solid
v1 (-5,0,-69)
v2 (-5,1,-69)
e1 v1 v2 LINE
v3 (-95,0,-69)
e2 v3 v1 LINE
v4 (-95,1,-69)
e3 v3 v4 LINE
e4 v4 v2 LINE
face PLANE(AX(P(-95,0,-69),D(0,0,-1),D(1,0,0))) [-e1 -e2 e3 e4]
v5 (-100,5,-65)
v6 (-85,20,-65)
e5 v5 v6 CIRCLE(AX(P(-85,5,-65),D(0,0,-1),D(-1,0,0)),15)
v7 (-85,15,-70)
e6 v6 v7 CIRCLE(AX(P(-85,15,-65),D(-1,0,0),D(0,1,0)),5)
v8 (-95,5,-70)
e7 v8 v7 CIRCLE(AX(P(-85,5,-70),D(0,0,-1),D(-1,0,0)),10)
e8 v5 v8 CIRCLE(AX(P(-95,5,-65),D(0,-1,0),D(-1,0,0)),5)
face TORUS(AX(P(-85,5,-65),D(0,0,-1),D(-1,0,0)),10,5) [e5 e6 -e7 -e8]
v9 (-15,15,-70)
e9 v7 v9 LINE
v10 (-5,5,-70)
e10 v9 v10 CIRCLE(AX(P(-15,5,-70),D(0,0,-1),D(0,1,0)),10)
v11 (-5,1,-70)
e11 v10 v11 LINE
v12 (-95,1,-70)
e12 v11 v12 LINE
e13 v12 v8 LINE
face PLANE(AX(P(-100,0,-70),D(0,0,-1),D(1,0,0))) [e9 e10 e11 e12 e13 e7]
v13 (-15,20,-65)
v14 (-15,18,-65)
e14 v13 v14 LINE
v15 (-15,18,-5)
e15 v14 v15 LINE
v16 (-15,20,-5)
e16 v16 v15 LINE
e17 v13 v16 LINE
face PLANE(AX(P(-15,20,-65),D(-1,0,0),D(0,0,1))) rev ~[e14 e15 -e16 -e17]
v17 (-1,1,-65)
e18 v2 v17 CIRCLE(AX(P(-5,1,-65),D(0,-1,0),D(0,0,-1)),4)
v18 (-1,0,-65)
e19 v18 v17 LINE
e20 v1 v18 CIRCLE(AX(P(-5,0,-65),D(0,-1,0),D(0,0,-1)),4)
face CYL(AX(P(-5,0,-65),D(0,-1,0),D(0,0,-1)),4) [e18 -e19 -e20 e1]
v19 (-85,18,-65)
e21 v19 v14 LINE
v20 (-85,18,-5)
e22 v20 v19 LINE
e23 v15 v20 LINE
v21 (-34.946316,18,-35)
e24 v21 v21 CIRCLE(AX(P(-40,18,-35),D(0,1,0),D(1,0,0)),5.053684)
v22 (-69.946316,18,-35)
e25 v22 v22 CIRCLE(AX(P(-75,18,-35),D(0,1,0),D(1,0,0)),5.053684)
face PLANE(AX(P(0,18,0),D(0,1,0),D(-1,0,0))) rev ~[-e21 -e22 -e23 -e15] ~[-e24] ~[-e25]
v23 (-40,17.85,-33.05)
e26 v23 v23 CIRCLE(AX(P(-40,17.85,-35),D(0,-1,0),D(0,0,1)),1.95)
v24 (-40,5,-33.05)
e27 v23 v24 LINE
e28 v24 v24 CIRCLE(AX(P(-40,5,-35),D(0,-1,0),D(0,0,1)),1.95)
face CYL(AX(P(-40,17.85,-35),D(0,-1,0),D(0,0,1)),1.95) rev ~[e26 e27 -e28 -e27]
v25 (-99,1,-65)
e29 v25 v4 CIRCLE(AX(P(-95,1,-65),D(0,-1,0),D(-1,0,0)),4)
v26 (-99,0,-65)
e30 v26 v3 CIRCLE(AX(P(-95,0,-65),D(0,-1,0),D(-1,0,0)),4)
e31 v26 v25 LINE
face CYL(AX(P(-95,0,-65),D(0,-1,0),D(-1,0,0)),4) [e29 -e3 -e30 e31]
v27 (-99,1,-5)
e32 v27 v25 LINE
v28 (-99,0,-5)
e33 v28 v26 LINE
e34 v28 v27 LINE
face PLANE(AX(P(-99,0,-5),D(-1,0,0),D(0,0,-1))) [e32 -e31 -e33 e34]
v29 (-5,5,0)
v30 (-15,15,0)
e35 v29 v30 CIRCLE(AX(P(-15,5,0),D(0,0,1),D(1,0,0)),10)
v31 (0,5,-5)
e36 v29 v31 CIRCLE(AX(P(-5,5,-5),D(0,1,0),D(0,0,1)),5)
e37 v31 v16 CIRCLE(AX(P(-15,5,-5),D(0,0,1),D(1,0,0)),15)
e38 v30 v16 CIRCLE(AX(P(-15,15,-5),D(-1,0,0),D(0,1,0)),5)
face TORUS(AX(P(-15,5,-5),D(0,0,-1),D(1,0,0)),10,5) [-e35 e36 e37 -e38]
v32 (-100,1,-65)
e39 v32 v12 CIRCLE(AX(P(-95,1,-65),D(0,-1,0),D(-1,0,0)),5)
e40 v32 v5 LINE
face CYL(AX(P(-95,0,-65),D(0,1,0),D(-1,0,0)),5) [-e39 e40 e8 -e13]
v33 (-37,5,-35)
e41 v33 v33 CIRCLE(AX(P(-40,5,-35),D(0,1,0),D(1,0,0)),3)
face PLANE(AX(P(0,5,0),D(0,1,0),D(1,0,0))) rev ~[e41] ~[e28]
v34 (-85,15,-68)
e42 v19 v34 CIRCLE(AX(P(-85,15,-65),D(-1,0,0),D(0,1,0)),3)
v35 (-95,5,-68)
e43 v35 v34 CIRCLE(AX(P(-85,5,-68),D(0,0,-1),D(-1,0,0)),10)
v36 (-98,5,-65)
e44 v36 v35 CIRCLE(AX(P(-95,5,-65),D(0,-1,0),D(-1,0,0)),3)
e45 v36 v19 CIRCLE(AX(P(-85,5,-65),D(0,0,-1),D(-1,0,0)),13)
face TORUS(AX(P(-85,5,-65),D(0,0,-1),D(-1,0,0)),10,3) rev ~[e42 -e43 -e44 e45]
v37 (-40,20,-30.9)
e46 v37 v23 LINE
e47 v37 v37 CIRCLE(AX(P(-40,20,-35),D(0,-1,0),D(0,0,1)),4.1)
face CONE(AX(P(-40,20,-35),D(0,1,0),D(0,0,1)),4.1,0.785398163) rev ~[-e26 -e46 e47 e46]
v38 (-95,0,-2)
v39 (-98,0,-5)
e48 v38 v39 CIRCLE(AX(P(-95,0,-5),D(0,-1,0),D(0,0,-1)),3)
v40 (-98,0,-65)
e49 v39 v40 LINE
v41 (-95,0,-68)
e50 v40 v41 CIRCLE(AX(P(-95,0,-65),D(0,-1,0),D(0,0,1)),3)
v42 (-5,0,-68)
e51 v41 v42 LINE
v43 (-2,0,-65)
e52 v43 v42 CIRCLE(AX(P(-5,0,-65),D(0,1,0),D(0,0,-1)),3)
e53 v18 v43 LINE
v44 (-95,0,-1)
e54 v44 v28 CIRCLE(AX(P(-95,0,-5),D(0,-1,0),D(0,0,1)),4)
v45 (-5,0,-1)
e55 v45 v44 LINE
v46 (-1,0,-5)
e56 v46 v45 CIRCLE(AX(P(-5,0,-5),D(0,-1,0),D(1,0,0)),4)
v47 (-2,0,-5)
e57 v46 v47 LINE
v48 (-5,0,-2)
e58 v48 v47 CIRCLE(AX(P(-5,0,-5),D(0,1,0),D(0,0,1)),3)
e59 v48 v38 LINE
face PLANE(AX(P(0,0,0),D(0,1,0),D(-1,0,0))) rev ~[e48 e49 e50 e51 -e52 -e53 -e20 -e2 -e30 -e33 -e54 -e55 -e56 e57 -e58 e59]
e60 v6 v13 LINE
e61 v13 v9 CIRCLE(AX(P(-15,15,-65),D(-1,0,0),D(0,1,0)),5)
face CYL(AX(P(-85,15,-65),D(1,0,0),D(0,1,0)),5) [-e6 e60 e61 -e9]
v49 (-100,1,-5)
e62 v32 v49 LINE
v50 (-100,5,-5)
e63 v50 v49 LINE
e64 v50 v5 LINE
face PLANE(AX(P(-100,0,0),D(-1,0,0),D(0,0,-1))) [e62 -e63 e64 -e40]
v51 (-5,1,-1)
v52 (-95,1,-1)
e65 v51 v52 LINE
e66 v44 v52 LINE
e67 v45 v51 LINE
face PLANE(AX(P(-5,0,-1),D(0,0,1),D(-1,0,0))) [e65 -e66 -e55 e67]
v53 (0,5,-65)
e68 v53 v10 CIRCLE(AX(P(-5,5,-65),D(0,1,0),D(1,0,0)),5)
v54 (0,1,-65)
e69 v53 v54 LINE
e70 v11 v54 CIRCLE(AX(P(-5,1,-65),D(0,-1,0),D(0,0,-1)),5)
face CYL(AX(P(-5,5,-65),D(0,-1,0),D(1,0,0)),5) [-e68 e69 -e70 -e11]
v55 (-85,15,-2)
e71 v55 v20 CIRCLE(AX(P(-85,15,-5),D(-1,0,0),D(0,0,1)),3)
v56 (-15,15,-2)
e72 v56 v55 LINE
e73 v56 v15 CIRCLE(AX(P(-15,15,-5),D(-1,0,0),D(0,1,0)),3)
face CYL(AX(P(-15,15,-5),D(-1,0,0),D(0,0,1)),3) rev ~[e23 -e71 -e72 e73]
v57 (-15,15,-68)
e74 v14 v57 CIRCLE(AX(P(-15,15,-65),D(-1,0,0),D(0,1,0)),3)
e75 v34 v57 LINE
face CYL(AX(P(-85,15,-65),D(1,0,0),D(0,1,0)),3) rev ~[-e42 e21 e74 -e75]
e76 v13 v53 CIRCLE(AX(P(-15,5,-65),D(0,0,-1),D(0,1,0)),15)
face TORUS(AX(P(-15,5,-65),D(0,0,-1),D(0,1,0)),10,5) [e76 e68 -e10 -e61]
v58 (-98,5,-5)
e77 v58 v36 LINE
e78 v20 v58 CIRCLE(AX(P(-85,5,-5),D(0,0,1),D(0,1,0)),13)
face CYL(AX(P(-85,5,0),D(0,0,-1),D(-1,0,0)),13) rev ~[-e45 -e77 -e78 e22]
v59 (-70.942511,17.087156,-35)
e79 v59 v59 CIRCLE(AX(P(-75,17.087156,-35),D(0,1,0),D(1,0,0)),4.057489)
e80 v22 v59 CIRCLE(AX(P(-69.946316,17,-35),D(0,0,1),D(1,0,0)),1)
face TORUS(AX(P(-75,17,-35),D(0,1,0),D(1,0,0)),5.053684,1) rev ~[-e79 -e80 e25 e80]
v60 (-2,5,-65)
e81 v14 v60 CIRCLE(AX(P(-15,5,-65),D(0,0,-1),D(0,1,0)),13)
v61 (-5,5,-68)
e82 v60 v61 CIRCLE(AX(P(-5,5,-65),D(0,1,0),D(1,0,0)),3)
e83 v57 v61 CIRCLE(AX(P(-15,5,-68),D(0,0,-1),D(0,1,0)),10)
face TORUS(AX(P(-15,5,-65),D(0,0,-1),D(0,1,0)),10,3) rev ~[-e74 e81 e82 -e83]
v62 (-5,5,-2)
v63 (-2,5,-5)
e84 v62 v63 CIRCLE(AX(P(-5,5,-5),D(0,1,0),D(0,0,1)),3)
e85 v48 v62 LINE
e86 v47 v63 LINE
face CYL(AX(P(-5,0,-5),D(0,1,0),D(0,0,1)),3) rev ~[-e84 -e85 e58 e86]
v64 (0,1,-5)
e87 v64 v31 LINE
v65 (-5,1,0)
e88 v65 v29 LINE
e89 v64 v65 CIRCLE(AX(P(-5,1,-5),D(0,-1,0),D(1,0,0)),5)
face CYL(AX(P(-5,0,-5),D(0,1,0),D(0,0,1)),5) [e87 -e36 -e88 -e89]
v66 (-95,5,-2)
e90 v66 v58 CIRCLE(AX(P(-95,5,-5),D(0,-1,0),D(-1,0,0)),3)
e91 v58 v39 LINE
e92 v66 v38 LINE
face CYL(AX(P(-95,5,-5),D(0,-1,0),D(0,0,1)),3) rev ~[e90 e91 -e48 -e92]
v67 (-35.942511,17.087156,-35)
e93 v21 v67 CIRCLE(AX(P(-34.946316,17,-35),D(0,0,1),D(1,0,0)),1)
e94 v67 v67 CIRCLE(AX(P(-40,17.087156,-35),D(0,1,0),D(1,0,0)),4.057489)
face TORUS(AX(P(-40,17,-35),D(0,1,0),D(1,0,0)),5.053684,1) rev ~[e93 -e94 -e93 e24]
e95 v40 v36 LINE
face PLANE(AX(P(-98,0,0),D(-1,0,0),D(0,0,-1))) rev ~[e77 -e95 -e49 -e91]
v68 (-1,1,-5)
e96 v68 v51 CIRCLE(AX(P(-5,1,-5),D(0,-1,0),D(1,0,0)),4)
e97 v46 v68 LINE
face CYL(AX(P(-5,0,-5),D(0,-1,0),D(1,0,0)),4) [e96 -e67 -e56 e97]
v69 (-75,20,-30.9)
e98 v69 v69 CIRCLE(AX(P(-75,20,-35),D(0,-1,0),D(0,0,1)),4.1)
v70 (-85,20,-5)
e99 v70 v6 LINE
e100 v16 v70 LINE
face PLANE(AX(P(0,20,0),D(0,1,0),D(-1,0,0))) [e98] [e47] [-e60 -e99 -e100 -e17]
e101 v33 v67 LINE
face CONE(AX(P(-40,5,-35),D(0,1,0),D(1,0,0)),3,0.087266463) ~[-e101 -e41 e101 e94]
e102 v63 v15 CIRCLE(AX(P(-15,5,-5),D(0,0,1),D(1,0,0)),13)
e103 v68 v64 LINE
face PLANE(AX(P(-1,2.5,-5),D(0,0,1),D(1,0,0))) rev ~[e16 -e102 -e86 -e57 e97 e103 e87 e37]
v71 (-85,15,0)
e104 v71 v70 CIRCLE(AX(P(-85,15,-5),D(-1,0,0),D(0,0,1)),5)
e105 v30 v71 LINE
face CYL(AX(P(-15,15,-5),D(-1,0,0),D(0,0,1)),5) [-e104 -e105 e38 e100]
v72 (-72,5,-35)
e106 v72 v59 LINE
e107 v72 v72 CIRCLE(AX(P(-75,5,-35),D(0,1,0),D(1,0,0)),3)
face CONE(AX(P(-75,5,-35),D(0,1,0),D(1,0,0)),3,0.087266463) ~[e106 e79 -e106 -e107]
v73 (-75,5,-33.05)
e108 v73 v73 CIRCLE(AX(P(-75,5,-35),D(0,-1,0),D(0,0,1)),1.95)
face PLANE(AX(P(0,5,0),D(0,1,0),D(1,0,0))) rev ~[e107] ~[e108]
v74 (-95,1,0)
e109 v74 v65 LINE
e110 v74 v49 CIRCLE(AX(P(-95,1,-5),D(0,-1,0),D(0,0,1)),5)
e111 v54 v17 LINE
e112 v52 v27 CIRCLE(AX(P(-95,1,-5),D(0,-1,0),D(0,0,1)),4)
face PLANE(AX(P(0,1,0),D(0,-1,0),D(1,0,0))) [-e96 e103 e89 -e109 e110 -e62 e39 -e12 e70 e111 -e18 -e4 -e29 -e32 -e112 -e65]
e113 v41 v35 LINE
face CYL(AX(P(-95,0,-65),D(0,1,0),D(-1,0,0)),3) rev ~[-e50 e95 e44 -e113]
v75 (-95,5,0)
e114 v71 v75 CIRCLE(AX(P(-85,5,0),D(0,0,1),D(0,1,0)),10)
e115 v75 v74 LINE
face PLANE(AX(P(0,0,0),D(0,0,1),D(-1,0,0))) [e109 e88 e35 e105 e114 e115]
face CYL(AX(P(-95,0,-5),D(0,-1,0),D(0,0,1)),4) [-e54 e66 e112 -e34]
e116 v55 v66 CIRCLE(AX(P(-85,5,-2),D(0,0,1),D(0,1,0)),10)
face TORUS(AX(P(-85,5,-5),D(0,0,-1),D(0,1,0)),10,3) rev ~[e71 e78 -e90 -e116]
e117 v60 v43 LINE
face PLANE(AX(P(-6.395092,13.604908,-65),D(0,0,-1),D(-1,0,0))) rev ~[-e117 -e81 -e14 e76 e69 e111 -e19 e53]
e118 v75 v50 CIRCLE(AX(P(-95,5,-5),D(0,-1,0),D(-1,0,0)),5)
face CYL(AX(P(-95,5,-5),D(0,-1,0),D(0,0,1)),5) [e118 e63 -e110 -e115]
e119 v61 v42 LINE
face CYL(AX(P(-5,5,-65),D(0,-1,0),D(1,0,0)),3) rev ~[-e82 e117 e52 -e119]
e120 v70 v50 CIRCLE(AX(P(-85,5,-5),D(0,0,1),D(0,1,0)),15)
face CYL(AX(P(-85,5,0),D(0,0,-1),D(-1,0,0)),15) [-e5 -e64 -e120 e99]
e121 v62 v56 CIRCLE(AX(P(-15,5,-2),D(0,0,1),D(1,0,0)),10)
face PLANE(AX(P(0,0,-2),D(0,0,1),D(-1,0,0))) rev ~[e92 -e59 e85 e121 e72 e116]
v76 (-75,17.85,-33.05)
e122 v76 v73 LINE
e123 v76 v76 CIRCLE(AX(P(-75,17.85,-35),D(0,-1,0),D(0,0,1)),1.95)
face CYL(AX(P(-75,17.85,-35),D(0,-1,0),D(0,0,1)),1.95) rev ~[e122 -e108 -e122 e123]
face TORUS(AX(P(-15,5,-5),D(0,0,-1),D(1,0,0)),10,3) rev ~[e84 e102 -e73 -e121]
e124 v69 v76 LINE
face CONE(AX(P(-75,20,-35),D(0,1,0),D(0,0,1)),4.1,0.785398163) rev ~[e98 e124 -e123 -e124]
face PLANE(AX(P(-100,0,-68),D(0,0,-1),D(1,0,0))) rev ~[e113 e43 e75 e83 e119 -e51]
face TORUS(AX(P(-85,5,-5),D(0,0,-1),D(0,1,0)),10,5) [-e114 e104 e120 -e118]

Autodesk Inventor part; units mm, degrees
ref_plane "YZ Plane" through (0, 0, 0) normal (1, 0, 0) x (0, 1, 0)
ref_plane "XZ Plane" through (0, 0, 0) normal (0, 1, 0) x (-1, 0, 0)
sketch "Sketch1" plane through (0, 0, 0) normal (0, 1, 0) x (-1, 0, 0)
  line L0 (0, 0) -> (100, 0)
  line L1 (100, 0) -> (100, -70)
  line L2 (100, -70) -> (0, -70)
  line L3 (0, -70) -> (0, 0)
  dimension "d0" = 100
  dimension "d1" = 70
extrude "Extrusion1" add sketch "Sketch1" along normal blind 20
fillet "Fillet1" radius 15 2 edges at (-100, 20, -35) (0, 20, -35)
fillet "Fillet2" radius 5 10 edges at (-4.3934, 15.6066, 0) (0, 2.5, 0) (-95.6066, 15.6066, 0) (-100, 2.5, 0) (-50, 20, 0) (-95.6066, 15.6066, -70) (-100, 2.5, -70) (-4.3934, 15.6066, -70) (0, 2.5, -70) (-50, 20, -70)
shell "Shell1" thickness 2 removed faces 3 at (-0.0419, 6.121, -45) at (0, 1.6667, -25) at (-65, 0, -46.6667)
ref_plane "Work Plane1" through (0, 5, 0) normal (0, 1, 0) x (1, 0, 0)
sketch "Sketch2" plane through (0, 5, 0) normal (0, 1, 0) x (1, 0, 0)
  line L0 (-85, 65) -> (-15, 65) construction
  line L1 (-15, 65) -> (-15, 5) construction
  line L2 (-15, 5) -> (-85, 5) construction
  line L3 (-85, 5) -> (-85, 65) construction
  line L4 (-85, 5) -> (-85, 65) construction
  line L5 (-85, 35) -> (-15, 35) construction
  line L6 (-85, 35) -> (-75, 35) construction
  line L7 (-75, 35) -> (-75, 65) construction
  line L8 (-100, 65) -> (-100, 5) construction
  line L9 (-98, 65) -> (-98, 5) construction
  line L10 (-5, 70) -> (-95, 70) construction
  line L11 (-5, 68) -> (-95, 68) construction
  line L12 (-95, 2) -> (-5, 2) construction
  line L13 (-95, 0) -> (-5, 0) construction
  line L14 (-40, 35) -> (-40, 65) construction
  circle A0 centre (-75, 35) radius 3
  circle A1 centre (-40, 35) radius 3
  point P0 (0, 0)
  dimension "d9" = 25
  dimension "d10" = 35
  dimension "d11" = 6
  dimension "d12" = 6
extrude "Extrusion2" add sketch "Sketch2" along normal up to surface (13 mm away) draft 5
sketch "Sketch3" plane through (0, 20, 0) normal (0, 1, 0) x (1, 0, 0)
  circle A0 centre (-75, 35) radius 3 construction
  circle A1 centre (-75, 35) radius 4.1374 construction
  circle A2 centre (-40, 35) radius 3 construction
  circle A3 centre (-40, 35) radius 4.1374 construction
  line L0 (-85, 65) -> (-15, 65) construction
  line L1 (-85, 5) -> (-85, 65) construction
  line L2 (-15, 5) -> (-85, 5) construction
  line L3 (-15, 65) -> (-15, 5) construction
  point P0 (0, 0)
hole "Hole1" at (-75, 20, -35) direction (0, -1, 0) diameter 3.9 depth 15 countersink diameter 8.2 countersink angle 90
hole "Hole2" at (-40, 20, -35) direction (0, -1, 0) diameter 3.9 depth 15 countersink diameter 8.2 countersink angle 90
fillet "Fillet3" radius 1 2 edges at (-44.1374, 18, -35) (-79.1374, 18, -35)
sketch "Sketch4" plane through (0, 0, 0) normal (0, -1, 0) x (1, 0, 0)
  arc A0 (0, -5) -> (-5, 0) centre (-5, -5) ccw projected
  line L0 (-95, 0) -> (-5, 0) projected
  arc A1 (-95, 0) -> (-100, -5) centre (-95, -5) ccw projected
  line L1 (-100, -65) -> (-100, -5) projected
  arc A2 (-100, -65) -> (-95, -70) centre (-95, -65) ccw projected
  line L2 (-5, -70) -> (-95, -70) projected
  arc A3 (-5, -70) -> (0, -65) centre (-5, -65) ccw projected
  arc A4 (-1, -5) -> (-5, -1) centre (-5, -5) ccw
  line L3 (-5, -1) -> (-95, -1)
  arc A5 (-95, -1) -> (-99, -5) centre (-95, -5) ccw
  line L4 (-99, -5) -> (-99, -65)
  arc A6 (-99, -65) -> (-95, -69) centre (-95, -65) ccw
  line L5 (-95, -69) -> (-5, -69)
  arc A7 (-5, -69) -> (-1, -65) centre (-5, -65) ccw
  line L6 (-2, -5) -> (0, -5) projected
  line L7 (-1, -5) -> (0, -5)
  line L8 (0, -65) -> (-2, -65) projected
  line L9 (-1, -65) -> (0, -65)
  point P0 (0, 0)
  dimension "d30" = 1
extrude "Extrusion3" cut sketch "Sketch4" against normal blind 1
properties part number "A1.1"
